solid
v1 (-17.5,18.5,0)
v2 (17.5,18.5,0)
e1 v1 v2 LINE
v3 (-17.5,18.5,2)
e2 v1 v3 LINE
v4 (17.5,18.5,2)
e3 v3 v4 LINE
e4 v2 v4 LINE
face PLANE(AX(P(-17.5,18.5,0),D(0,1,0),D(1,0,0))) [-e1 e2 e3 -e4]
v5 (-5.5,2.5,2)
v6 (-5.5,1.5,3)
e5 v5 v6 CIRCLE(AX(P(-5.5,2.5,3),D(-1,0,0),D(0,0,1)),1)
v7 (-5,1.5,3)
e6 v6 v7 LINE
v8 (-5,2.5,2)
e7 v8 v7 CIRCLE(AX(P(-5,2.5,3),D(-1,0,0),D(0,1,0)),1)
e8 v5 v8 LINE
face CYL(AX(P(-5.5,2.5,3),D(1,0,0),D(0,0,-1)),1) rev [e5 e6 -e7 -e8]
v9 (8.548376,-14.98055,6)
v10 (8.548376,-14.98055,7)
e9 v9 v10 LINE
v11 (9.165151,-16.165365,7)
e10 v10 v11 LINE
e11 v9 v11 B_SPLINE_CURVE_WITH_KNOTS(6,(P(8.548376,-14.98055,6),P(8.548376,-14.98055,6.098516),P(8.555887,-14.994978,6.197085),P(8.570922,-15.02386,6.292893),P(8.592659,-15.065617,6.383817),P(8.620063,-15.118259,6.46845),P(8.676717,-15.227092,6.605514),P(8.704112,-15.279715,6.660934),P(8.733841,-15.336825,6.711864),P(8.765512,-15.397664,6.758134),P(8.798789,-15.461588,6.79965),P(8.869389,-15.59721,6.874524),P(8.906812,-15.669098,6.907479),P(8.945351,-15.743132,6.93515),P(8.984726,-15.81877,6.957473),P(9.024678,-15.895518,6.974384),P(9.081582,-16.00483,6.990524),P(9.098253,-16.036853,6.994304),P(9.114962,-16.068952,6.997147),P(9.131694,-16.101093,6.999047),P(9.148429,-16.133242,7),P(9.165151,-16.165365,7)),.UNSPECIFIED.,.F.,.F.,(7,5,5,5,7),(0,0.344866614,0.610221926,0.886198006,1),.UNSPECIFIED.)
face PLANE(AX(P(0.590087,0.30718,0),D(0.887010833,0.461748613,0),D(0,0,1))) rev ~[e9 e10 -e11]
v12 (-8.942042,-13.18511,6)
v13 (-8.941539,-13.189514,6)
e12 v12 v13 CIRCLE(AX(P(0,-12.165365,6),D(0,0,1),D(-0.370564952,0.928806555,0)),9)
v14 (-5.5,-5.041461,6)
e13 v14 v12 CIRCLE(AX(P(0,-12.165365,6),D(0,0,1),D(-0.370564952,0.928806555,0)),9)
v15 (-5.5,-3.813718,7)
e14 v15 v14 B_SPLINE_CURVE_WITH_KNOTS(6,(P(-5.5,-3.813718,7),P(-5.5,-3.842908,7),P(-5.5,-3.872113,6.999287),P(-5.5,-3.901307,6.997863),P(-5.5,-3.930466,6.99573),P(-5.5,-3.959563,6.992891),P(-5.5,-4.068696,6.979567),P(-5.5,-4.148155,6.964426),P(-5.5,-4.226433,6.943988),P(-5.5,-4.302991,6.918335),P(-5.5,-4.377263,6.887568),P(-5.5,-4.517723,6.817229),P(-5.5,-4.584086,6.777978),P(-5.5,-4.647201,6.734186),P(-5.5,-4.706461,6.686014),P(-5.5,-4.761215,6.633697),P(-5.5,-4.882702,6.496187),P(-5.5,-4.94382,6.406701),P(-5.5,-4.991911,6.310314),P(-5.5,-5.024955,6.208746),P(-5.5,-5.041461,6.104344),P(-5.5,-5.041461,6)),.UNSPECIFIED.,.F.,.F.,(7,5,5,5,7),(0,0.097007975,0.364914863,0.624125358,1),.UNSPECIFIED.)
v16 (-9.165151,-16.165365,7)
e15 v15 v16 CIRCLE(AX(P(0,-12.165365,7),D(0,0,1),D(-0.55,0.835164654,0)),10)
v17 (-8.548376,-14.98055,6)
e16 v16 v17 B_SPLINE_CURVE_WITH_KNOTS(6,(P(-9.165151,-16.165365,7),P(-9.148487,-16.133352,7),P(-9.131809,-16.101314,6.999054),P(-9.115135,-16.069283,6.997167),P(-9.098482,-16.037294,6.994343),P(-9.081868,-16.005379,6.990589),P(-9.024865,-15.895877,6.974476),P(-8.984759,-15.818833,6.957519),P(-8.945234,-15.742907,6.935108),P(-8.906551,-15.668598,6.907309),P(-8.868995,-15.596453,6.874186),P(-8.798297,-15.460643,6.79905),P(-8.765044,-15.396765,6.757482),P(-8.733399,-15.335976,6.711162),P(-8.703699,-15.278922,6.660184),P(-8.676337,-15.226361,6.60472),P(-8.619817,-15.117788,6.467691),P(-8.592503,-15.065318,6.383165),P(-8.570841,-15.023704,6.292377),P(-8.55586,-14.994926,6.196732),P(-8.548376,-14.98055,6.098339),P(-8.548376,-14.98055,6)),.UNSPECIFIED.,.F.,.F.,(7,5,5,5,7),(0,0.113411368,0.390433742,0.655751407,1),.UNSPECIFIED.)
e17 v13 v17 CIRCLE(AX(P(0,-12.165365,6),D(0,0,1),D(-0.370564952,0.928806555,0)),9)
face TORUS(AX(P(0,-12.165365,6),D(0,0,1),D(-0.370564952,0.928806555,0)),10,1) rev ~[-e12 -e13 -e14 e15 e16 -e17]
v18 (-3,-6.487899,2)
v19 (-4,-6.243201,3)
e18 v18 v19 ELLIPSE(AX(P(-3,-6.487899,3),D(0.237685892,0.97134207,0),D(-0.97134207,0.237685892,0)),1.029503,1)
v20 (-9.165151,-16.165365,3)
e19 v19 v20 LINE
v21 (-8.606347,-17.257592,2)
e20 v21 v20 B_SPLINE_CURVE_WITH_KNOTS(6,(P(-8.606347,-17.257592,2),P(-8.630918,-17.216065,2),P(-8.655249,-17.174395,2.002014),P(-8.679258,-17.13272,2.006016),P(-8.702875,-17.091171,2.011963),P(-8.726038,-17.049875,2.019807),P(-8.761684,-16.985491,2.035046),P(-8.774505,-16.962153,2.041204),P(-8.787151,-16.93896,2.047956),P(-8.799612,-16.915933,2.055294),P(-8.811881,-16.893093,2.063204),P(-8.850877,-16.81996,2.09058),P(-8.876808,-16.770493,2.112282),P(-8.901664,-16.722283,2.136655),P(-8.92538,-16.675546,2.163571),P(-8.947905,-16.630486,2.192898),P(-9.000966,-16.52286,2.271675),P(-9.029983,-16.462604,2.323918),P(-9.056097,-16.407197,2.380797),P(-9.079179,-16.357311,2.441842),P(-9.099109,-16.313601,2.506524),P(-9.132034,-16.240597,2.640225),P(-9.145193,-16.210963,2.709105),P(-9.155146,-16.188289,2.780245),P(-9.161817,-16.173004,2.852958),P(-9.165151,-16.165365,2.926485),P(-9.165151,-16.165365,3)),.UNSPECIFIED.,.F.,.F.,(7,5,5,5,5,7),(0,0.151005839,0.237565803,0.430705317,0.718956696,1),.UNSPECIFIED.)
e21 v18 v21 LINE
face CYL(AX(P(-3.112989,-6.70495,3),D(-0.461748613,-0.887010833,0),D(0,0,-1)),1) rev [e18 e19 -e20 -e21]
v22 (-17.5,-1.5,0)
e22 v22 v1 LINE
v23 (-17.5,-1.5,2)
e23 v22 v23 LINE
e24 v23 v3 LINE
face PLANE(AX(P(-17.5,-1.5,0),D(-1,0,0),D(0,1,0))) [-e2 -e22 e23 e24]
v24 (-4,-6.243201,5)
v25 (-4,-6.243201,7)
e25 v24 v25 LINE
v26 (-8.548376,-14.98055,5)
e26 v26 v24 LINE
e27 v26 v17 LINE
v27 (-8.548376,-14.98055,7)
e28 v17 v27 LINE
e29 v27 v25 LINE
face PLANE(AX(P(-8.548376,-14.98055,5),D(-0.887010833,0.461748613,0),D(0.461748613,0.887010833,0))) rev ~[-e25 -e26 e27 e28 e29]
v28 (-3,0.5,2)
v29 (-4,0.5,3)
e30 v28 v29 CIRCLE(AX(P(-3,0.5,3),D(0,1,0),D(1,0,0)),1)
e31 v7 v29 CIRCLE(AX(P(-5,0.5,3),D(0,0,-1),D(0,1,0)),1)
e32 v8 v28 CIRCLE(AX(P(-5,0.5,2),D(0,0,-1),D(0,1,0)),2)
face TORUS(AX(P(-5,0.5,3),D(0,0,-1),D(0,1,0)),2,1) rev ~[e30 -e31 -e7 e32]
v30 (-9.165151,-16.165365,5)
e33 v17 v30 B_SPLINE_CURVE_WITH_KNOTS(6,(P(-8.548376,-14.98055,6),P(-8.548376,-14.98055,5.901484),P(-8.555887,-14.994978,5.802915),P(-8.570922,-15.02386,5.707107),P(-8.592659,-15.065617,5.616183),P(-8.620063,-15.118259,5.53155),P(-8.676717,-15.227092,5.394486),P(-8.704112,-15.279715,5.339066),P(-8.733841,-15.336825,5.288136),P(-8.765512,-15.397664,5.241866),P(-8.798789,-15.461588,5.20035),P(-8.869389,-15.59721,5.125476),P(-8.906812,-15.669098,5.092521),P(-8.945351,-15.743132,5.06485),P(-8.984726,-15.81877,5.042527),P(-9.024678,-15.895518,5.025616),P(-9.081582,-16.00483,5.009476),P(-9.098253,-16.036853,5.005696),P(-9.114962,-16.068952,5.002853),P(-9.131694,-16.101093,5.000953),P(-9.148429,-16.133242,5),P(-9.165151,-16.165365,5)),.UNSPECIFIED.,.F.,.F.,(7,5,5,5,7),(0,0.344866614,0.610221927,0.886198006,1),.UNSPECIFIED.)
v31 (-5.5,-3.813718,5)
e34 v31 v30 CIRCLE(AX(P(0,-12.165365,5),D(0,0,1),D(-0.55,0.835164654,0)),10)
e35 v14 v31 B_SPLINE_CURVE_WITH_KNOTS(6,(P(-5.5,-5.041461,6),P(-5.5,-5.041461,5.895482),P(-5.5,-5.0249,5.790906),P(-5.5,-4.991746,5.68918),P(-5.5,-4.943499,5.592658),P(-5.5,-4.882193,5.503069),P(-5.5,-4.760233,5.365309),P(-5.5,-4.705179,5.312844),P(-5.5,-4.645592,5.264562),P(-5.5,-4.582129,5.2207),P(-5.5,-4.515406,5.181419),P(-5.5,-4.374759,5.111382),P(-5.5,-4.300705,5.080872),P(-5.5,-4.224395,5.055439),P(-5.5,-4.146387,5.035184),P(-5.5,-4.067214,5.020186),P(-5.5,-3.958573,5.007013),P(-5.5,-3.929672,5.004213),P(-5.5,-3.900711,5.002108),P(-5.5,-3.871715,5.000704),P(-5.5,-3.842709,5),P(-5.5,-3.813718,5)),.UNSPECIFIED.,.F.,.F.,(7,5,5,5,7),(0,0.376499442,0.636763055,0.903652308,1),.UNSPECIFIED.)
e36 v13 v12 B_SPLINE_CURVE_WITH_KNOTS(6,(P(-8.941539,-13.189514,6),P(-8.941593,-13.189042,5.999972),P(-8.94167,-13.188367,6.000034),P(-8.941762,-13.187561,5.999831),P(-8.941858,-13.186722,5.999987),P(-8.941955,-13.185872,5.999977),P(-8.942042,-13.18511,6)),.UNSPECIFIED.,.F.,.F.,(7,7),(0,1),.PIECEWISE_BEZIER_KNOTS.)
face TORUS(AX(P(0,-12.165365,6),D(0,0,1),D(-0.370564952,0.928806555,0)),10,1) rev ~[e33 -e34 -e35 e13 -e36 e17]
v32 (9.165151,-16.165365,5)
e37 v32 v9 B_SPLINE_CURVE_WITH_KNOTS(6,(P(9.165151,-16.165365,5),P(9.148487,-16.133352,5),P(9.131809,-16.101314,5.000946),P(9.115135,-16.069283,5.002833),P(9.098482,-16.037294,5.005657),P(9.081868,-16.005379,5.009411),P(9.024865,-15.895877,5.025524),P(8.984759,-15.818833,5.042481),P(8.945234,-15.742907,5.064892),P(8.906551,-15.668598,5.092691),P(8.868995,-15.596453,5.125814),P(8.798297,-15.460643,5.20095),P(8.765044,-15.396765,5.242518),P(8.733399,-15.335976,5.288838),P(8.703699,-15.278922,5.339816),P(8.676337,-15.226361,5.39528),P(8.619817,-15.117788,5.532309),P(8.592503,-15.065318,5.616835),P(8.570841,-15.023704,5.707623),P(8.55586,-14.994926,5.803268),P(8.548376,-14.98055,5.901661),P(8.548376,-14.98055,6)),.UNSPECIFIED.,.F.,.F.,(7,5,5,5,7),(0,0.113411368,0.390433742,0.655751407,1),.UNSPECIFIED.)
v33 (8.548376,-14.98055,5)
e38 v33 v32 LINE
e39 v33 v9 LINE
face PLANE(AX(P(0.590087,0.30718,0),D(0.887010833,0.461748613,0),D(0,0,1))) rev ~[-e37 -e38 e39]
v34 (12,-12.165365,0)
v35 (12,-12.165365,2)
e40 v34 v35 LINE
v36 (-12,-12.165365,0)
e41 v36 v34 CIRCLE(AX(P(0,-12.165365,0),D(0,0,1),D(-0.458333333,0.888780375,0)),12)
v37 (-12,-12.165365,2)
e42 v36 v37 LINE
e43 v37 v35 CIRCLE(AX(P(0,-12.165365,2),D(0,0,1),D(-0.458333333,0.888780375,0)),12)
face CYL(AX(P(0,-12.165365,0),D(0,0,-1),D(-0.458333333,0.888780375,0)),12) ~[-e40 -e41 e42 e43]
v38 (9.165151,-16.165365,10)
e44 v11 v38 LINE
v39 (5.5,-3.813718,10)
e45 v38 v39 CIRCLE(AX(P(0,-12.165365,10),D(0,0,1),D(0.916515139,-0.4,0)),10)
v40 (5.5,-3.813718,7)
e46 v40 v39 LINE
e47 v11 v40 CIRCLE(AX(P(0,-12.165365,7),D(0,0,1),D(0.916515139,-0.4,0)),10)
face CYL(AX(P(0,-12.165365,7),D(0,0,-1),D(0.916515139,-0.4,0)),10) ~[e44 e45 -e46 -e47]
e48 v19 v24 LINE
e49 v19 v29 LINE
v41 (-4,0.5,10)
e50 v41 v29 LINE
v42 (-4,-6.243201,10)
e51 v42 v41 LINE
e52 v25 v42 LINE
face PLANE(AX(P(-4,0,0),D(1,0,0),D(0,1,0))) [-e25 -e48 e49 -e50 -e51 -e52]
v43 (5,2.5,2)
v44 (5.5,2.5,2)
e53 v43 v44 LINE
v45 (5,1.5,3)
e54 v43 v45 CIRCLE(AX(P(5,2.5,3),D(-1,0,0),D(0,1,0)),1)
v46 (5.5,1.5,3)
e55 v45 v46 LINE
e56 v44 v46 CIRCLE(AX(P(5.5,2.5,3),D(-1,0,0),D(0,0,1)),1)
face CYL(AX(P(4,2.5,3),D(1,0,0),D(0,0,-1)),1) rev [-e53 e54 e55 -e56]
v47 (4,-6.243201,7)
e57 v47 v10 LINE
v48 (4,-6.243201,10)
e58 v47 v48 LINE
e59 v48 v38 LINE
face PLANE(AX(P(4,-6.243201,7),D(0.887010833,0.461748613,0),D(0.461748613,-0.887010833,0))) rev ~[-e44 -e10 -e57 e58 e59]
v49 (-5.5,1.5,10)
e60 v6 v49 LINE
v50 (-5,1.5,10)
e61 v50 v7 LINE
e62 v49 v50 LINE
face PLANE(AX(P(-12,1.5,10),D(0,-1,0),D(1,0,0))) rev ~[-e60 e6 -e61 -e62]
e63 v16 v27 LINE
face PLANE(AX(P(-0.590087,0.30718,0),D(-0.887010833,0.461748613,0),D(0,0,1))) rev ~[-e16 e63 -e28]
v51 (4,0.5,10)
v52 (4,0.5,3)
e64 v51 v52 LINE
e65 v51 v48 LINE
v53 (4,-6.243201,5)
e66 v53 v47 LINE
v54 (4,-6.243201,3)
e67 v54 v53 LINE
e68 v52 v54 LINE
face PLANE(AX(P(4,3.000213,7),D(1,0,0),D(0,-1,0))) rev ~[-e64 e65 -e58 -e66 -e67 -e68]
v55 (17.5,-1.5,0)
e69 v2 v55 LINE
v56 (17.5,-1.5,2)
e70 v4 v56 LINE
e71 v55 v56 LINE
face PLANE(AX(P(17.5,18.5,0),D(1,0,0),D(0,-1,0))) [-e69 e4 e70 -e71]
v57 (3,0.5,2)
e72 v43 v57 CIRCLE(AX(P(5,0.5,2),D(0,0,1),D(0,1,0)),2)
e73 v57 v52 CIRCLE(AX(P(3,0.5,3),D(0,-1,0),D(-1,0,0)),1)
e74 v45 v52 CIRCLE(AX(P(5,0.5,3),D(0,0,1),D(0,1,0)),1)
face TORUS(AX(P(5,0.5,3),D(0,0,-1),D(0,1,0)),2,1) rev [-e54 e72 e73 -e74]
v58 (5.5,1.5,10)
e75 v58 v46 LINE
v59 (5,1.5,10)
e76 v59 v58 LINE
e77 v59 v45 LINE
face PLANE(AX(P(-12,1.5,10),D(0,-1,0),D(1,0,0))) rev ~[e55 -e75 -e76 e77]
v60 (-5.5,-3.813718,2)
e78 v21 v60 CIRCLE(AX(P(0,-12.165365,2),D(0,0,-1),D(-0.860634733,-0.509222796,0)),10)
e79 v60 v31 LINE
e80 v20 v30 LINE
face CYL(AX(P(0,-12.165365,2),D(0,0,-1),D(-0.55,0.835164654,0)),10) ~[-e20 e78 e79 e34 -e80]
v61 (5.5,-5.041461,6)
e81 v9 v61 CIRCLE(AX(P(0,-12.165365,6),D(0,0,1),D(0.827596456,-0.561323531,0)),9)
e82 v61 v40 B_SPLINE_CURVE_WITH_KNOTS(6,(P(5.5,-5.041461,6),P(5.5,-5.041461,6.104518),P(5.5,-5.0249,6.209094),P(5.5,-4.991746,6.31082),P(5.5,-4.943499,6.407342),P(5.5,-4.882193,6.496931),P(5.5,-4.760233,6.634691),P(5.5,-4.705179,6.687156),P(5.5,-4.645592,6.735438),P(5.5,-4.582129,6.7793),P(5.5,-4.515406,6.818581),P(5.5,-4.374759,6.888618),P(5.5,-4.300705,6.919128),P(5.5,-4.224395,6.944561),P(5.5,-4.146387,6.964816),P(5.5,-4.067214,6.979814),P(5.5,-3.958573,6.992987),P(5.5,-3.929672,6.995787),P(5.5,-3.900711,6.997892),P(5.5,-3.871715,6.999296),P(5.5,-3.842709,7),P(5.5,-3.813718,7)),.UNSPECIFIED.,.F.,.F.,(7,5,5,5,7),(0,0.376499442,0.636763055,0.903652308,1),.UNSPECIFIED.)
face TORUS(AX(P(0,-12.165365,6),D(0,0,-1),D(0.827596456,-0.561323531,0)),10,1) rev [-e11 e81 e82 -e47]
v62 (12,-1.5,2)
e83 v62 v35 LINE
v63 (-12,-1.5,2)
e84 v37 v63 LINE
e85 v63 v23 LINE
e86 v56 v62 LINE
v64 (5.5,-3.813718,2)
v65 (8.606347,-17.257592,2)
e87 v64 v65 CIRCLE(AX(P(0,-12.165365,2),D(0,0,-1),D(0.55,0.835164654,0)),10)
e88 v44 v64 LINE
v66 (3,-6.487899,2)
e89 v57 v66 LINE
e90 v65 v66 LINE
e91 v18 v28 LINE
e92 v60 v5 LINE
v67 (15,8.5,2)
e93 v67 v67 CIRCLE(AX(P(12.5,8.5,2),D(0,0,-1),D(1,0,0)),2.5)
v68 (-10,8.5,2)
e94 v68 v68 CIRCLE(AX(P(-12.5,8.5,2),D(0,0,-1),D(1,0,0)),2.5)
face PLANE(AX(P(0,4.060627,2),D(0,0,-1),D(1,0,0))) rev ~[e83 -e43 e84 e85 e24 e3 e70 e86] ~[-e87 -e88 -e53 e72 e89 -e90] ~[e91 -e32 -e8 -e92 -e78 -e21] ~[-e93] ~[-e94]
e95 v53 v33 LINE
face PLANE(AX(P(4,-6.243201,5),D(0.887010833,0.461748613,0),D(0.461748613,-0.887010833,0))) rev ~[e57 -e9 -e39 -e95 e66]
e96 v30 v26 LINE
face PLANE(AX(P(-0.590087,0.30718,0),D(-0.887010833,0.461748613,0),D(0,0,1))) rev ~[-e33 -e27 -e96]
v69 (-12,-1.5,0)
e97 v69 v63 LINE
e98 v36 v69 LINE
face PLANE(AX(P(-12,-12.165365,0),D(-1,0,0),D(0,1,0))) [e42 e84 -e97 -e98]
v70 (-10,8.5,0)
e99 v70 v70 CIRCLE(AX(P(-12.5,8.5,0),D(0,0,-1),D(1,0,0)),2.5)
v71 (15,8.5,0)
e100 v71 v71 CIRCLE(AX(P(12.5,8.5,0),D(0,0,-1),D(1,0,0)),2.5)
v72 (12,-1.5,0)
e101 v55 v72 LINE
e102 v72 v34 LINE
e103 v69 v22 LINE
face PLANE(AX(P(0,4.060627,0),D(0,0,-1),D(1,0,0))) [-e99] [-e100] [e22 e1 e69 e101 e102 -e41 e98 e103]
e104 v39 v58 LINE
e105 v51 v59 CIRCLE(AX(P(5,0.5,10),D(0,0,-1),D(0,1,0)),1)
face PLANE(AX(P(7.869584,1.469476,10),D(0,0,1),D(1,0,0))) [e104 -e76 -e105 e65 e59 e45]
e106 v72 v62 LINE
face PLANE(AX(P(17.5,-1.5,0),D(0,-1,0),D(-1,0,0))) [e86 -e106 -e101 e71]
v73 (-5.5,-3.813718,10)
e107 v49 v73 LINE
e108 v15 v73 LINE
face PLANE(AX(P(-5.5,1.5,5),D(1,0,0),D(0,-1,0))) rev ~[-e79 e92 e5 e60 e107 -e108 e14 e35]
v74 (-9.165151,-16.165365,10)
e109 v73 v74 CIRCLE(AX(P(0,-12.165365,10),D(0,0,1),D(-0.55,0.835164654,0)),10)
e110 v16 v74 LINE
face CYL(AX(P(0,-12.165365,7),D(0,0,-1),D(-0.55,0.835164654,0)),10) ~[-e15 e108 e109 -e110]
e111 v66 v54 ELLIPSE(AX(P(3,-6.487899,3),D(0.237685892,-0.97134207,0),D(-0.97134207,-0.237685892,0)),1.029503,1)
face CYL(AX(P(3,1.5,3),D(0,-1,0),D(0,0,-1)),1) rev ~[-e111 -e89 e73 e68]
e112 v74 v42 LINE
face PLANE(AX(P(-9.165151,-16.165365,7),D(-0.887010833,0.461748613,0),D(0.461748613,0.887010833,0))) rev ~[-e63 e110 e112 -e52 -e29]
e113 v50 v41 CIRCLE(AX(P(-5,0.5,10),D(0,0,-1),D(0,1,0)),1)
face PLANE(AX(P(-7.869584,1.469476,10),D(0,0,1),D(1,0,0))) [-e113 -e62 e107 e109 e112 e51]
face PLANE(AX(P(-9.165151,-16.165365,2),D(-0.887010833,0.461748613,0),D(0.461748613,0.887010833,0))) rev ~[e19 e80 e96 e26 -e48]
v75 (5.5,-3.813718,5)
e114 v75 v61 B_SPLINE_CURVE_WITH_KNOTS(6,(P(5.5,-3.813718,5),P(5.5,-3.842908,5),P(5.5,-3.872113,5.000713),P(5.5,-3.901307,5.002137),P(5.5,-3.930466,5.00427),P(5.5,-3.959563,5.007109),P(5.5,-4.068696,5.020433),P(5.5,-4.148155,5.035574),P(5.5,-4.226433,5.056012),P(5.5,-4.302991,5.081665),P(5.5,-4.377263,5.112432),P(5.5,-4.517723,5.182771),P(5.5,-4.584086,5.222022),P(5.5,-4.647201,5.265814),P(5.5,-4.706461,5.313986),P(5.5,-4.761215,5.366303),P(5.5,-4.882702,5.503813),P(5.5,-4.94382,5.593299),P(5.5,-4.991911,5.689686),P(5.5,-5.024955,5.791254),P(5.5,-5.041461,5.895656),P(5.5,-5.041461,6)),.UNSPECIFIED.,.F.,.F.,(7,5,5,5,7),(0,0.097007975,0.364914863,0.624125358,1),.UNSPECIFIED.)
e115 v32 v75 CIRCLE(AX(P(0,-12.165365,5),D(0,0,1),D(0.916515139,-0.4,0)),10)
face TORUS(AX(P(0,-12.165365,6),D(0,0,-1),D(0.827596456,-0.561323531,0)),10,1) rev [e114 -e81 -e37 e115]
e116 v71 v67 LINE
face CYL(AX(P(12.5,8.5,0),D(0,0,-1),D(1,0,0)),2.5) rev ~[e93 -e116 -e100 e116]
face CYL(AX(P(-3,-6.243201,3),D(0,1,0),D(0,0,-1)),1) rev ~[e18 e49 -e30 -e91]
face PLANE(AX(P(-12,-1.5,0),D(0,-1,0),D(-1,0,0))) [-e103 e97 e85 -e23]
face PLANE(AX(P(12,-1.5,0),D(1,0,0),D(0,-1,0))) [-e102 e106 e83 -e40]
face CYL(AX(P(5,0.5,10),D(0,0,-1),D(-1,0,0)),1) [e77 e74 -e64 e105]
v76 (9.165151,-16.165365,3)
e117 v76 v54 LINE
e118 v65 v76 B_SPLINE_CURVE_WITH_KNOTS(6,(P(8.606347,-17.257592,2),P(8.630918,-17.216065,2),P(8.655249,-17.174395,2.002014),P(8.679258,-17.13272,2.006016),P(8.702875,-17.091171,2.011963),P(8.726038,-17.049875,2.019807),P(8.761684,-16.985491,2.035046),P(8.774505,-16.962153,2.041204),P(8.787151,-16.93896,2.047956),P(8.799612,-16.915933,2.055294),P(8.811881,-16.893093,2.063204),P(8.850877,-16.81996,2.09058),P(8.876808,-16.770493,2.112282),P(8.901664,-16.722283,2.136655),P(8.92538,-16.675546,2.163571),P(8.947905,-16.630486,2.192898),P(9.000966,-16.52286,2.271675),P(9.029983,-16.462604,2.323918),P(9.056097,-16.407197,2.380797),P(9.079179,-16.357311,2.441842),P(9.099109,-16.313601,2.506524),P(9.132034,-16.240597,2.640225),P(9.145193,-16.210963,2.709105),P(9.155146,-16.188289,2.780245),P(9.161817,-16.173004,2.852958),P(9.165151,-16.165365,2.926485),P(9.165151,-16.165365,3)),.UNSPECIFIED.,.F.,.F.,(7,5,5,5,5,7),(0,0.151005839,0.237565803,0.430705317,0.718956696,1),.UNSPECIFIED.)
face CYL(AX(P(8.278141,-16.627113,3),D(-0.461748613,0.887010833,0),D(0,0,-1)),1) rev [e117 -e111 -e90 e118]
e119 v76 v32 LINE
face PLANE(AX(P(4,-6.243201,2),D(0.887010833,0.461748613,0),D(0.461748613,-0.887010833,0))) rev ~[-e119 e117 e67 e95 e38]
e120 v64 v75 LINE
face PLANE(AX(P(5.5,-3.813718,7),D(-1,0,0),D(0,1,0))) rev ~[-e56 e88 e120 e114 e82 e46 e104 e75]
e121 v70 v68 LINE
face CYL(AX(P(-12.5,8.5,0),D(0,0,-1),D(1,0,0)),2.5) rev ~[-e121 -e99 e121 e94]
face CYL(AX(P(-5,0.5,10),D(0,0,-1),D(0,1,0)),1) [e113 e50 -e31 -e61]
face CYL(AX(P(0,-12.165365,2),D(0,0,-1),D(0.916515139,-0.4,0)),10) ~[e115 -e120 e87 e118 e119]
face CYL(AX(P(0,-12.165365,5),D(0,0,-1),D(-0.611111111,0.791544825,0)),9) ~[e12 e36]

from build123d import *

# Parameters (mm, degrees)
F1_DEPTH     = 2
F3_DEPTH     = 3
F5_DEPTH     = 2
F7_DEPTH     = 3
F8_T4_ANGLE  = 102.3969146675
F8_T10_ANGLE = 102.3969146675
F8_T16_ANGLE = 102.3969146675
F8_T22_ANGLE = 102.3969146675
F8_T26_ANGLE = 121.7069479791
F8_T28_ANGLE = 121.7069479791
F8_T30_ANGLE = 121.7069479791
F8_T32_ANGLE = 121.7069479791
F9_W         = 24
F9_H         = 22.6653645039
F10_DEPTH    = 10
F11_R        = 2.5
F12_DEPTH    = 2
F13_R        = 1


# Not quite as in the source:
# - a fillet or chamfer that OpenCascade refuses, or shapes differently, is made with other operations: its cross-section is extruded or revolved along the edge and cut away or added


with BuildPart() as f1:
    # F0 (on Top) → F1 (new body)
    with BuildSketch(Plane.XY):
        with BuildLine():
            ThreePointArc((5.5, 1.5), (0, 24.1653645039), (-5.5, 1.5))
            Line((-5.5, 1.5), (-5.5, -1.5))
            ThreePointArc((-5.5, -1.5), (0, -24.1653645039), (5.5, -1.5))
            Line((5.5, -1.5), (5.5, 1.5))
        make_face()
    extrude(amount=F1_DEPTH)

    # F2 (on face) → F3 (join)
    with BuildSketch(Plane.XY.offset(2)):
        with BuildLine():
            Line((9.7844830762, 19.1125863177), (8.6602540378, 17.1653645039))
            ThreePointArc((8.6602540378, 17.1653645039), (9.4991255677, 9.0402063559), (4, 3.0002131139))
            Line((4, 3.0002131139), (4, -6.2432010007))
            Line((4, -6.2432010007), (9.1651513899, -16.1653645039))
            ThreePointArc((9.1651513899, -16.1653645039), (9.5868378212, -9.3206253964), (5.5, -3.8137179596))
            Line((5.5, -3.8137179596), (5.5, 1.5))
            ThreePointArc((5.5, 1.5), (11.6599594736, 9.3289327537), (9.7844830762, 19.1125863177))
        make_face()
        with BuildLine():
            ThreePointArc((-4, 3.0002131139), (-9.4991255677, 9.0402063559), (-8.6602540378, 17.1653645039))
            Line((-8.6602540378, 17.1653645039), (-9.7844830762, 19.1125863177))
            ThreePointArc((-9.7844830762, 19.1125863177), (-11.6599594736, 9.3289327537), (-5.5, 1.5))
            Line((-5.5, 1.5), (-5.5, -3.8137179596))
            ThreePointArc((-5.5, -3.8137179596), (-9.5868378212, -9.3206253964), (-9.1651513899, -16.1653645039))
            Line((-9.1651513899, -16.1653645039), (-4, -6.2432010007))
            Line((-4, -6.2432010007), (-4, 3.0002131139))
        make_face()
    extrude(amount=F3_DEPTH)

    # F4 (on face) → F5 (join)
    with BuildSketch(Plane.XY.offset(5)):
        with BuildLine():
            Line((-8.0717844057, 16.1461052023), (-9.7844830762, 19.1125863177))
            ThreePointArc((-9.7844830762, 19.1125863177), (-11.6599594736, 9.3289327537), (-5.5, 1.5))
            Line((-5.5, 1.5), (-5.5, -5.0414610795))
            ThreePointArc((-5.5, -5.0414610795), (-8.6043935433, -9.5263473097), (-8.5483759414, -14.980549891))
            Line((-8.5483759414, -14.980549891), (-4, -6.2432010007))
            Line((-4, -6.2432010007), (-4, 4.1031067556))
            ThreePointArc((-4, 4.1031067556), (-8.5258693153, 9.2827350759), (-8.0717844057, 16.1461052023))
        make_face()
        with BuildLine():
            ThreePointArc((5.5, 1.5), (11.6599594736, 9.3289327537), (9.7844830762, 19.1125863177))
            Line((9.7844830762, 19.1125863177), (8.0717844057, 16.1461052023))
            ThreePointArc((8.0717844057, 16.1461052023), (8.5258693153, 9.2827350759), (4, 4.1031067556))
            Line((4, 4.1031067556), (4, -6.2432010007))
            Line((4, -6.2432010007), (8.5483759414, -14.980549891))
            ThreePointArc((8.5483759414, -14.980549891), (8.6043935433, -9.5263473097), (5.5, -5.0414610795))
            Line((5.5, -5.0414610795), (5.5, 1.5))
        make_face()
    extrude(amount=F5_DEPTH)

    # F6 (on face) → F7 (join)
    with BuildSketch(Plane.XY.offset(7)):
        with BuildLine():
            Line((9.7844830762, 19.1125863177), (8.6602540378, 17.1653645039))
            ThreePointArc((8.6602540378, 17.1653645039), (9.4991255677, 9.0402063559), (4, 3.0002131139))
            Line((4, 3.0002131139), (4, -6.2432010007))
            Line((4, -6.2432010007), (9.1651513899, -16.1653645039))
            ThreePointArc((9.1651513899, -16.1653645039), (9.5868378212, -9.3206253964), (5.5, -3.8137179596))
            Line((5.5, -3.8137179596), (5.5, 1.5))
            ThreePointArc((5.5, 1.5), (11.6599594736, 9.3289327537), (9.7844830762, 19.1125863177))
        make_face()
        with BuildLine():
            ThreePointArc((-4, 3.0002131139), (-9.4991255677, 9.0402063559), (-8.6602540378, 17.1653645039))
            Line((-8.6602540378, 17.1653645039), (-9.7844830762, 19.1125863177))
            ThreePointArc((-9.7844830762, 19.1125863177), (-11.6599594736, 9.3289327537), (-5.5, 1.5))
            Line((-5.5, 1.5), (-5.5, -3.8137179596))
            ThreePointArc((-5.5, -3.8137179596), (-9.5868378212, -9.3206253964), (-9.1651513899, -16.1653645039))
            Line((-9.1651513899, -16.1653645039), (-4, -6.2432010007))
            Line((-4, -6.2432010007), (-4, 3.0002131139))
        make_face()
    extrude(amount=F7_DEPTH)

    # F8: fillet of radius 1 on 8 edges, made by hand


with BuildPart() as f8_tool2:
    # F8_s3 → F8_t4 (revolve)
    with BuildSketch(Plane(origin=(-4.1871135562, -1.6705281924, 0), x_dir=(0, 0, 1), z_dir=(0.9288065548, 0.3705649522, 0))):
        with BuildLine():
            ThreePointArc((6, 2.2992702923), (5.2928932188, 2.0063770734), (5, 1.2992702923))
            Line((5, 1.2992702923), (5, 2.2992702923))
            Line((5, 2.2992702923), (6, 2.2992702923))
        make_face()
    revolve(axis=Axis((0, -12.1653645039, 5), (0, 0, 1)), revolution_arc=F8_T4_ANGLE)

    split(bisect_by=Plane(origin=(-0.5900874414, 0.3071800789, 0), x_dir=(0, 0, 1), z_dir=(-0.8870108332, 0.4617486132, 0)), keep=Keep.TOP)

    split(bisect_by=Plane.YZ.offset(-4), keep=Keep.BOTTOM)


with BuildPart() as f1_1:
    add(f1.part)

    # F8_t1: union F8_tool2
    add(f8_tool2.part)


with BuildPart() as f8_tool8:
    # F8_s9 → F8_t10 (revolve)
    with BuildSketch(Plane(origin=(-4.1871135562, -1.6705281924, 0), x_dir=(0, 0, 1), z_dir=(0.9288065548, 0.3705649522, 0))):
        with BuildLine():
            ThreePointArc((7, 1.2992702923), (6.7071067812, 2.0063770734), (6, 2.2992702923))
            Line((6, 2.2992702923), (7, 2.2992702923))
            Line((7, 2.2992702923), (7, 1.2992702923))
        make_face()
    revolve(axis=Axis((0, -12.1653645039, 7), (0, 0, 1)), revolution_arc=F8_T10_ANGLE)

    split(bisect_by=Plane(origin=(-0.5900874414, 0.3071800789, 0), x_dir=(0, 0, 1), z_dir=(-0.8870108332, 0.4617486132, 0)), keep=Keep.TOP)

    split(bisect_by=Plane.YZ.offset(-4), keep=Keep.BOTTOM)


with BuildPart() as f1_2:
    add(f1_1.part)

    # F8_t7: union F8_tool8
    add(f8_tool8.part)


with BuildPart() as f8_tool14:
    # F8_s15 → F8_t16 (revolve)
    with BuildSketch(Plane(origin=(-5.6514123525, -8.3322514997, 0), x_dir=(0, 0, 1), z_dir=(-0.561323531, -0.8275964557, 0))):
        with BuildLine():
            ThreePointArc((6, -15.828705359), (6.7071067812, -16.1215985778), (7, -16.828705359))
            Line((7, -16.828705359), (7, -15.828705359))
            Line((7, -15.828705359), (6, -15.828705359))
        make_face()
    revolve(axis=Axis((0, -12.1653645039, 7), (0, 0, 1)), revolution_arc=F8_T16_ANGLE)

    split(bisect_by=Plane.YZ.offset(4), keep=Keep.TOP)

    split(bisect_by=Plane(origin=(0.5900874414, 0.3071800789, 0), x_dir=(0, 0, 1), z_dir=(0.8870108332, 0.4617486132, 0)), keep=Keep.TOP)


with BuildPart() as f1_3:
    add(f1_2.part)

    # F8_t13: union F8_tool14
    add(f8_tool14.part)


with BuildPart() as f8_tool20:
    # F8_s21 → F8_t22 (revolve)
    with BuildSketch(Plane(origin=(-5.6514123525, -8.3322514997, 0), x_dir=(0, 0, 1), z_dir=(-0.561323531, -0.8275964557, 0))):
        with BuildLine():
            ThreePointArc((5, -16.828705359), (5.2928932188, -16.1215985778), (6, -15.828705359))
            Line((6, -15.828705359), (5, -15.828705359))
            Line((5, -15.828705359), (5, -16.828705359))
        make_face()
    revolve(axis=Axis((0, -12.1653645039, 5), (0, 0, 1)), revolution_arc=F8_T22_ANGLE)

    split(bisect_by=Plane.YZ.offset(4), keep=Keep.TOP)

    split(bisect_by=Plane(origin=(0.5900874414, 0.3071800789, 0), x_dir=(0, 0, 1), z_dir=(0.8870108332, 0.4617486132, 0)), keep=Keep.TOP)


with BuildPart() as f1_4:
    add(f1_3.part)

    # F8_t19: union F8_tool20
    add(f8_tool20.part)

    # F8_s25 → F8_t26 (revolve, cut)
    with BuildSketch(Plane(origin=(-6.0530874143, 6.6819786169, 0), x_dir=(0, 0, 1), z_dir=(-0.6713698624, 0.7411224648, 0))):
        with BuildLine():
            ThreePointArc((7, 18.1674590926), (6.7071067812, 17.4603523114), (6, 17.1674590926))
            Line((6, 17.1674590926), (7, 17.1674590926))
            Line((7, 17.1674590926), (7, 18.1674590926))
        make_face()
    revolve(axis=Axis((0, 12.1653645039, 7), (0, 0, -1)), revolution_arc=F8_T26_ANGLE, mode=Mode.SUBTRACT)

    # F8_s27 → F8_t28 (revolve, cut)
    with BuildSketch(Plane(origin=(-2.1730837017, 0.4014208952, 0), x_dir=(0, 0, 1), z_dir=(0.9833630917, -0.1816508459, 0))):
        with BuildLine():
            ThreePointArc((6, -2.9629704506), (6.7071067812, -2.6700772318), (7, -1.9629704506))
            Line((7, -1.9629704506), (7, -2.9629704506))
            Line((7, -2.9629704506), (6, -2.9629704506))
        make_face()
    revolve(axis=Axis((0, 12.1653645039, 7), (0, 0, -1)), revolution_arc=F8_T28_ANGLE, mode=Mode.SUBTRACT)

    # F8_s29 → F8_t30 (revolve, cut)
    with BuildSketch(Plane(origin=(-2.1730837017, 0.4014208952, 0), x_dir=(0, 0, 1), z_dir=(0.9833630917, -0.1816508459, 0))):
        with BuildLine():
            ThreePointArc((5, -1.9629704506), (5.2928932188, -2.6700772318), (6, -2.9629704506))
            Line((6, -2.9629704506), (5, -2.9629704506))
            Line((5, -2.9629704506), (5, -1.9629704506))
        make_face()
    revolve(axis=Axis((0, 12.1653645039, 5), (0, 0, -1)), revolution_arc=F8_T30_ANGLE, mode=Mode.SUBTRACT)

    # F8_s31 → F8_t32 (revolve, cut)
    with BuildSketch(Plane(origin=(-6.0530874143, 6.6819786169, 0), x_dir=(0, 0, 1), z_dir=(-0.6713698624, 0.7411224648, 0))):
        with BuildLine():
            ThreePointArc((6, 17.1674590926), (5.2928932188, 17.4603523114), (5, 18.1674590926))
            Line((5, 18.1674590926), (5, 17.1674590926))
            Line((5, 17.1674590926), (6, 17.1674590926))
        make_face()
    revolve(axis=Axis((0, 12.1653645039, 5), (0, 0, -1)), revolution_arc=F8_T32_ANGLE, mode=Mode.SUBTRACT)

    # F9 (on face) → F10 (cut)
    with BuildSketch(Plane.XY.offset(10)):
        with Locations((0, 12.8326822519)):
            Rectangle(F9_W, F9_H)
    extrude(amount=-F10_DEPTH, mode=Mode.SUBTRACT)

    # F11 (on face) → F12 (join)
    with BuildSketch(Plane(origin=(0, 0, 0), x_dir=(1, 0, 0), z_dir=(0, 0, -1))):
        Polygon((12, 1.5), (12, 12.1653645039), (-12, 12.1653645039), (-12, 1.5), (-17.5, 1.5), (-17.5, -18.5), (17.5, -18.5), (17.5, 1.5), align=None)
        with Locations((-12.5, -8.5)):
            Circle(F11_R, mode=Mode.SUBTRACT)
        with Locations((12.5, -8.5)):
            Circle(F11_R, mode=Mode.SUBTRACT)
    extrude(amount=-F12_DEPTH)

    # F13
    f13_edges = [f1_4.edges().sort_by_distance(p)[0] for p in [
        (-4, 1.5, 6),
        (4, 1.5, 6),
        (4.75, 1.5, 2),
        (-4.75, 1.5, 2),
        (6.582576, -11.204283, 2),
        (-6.582576, -11.204283, 2),
        (-4, -2.371601, 2),
        (4, -2.371601, 2),
    ]]
    fillet(f13_edges, radius=F13_R)


solid = f1_4.part
